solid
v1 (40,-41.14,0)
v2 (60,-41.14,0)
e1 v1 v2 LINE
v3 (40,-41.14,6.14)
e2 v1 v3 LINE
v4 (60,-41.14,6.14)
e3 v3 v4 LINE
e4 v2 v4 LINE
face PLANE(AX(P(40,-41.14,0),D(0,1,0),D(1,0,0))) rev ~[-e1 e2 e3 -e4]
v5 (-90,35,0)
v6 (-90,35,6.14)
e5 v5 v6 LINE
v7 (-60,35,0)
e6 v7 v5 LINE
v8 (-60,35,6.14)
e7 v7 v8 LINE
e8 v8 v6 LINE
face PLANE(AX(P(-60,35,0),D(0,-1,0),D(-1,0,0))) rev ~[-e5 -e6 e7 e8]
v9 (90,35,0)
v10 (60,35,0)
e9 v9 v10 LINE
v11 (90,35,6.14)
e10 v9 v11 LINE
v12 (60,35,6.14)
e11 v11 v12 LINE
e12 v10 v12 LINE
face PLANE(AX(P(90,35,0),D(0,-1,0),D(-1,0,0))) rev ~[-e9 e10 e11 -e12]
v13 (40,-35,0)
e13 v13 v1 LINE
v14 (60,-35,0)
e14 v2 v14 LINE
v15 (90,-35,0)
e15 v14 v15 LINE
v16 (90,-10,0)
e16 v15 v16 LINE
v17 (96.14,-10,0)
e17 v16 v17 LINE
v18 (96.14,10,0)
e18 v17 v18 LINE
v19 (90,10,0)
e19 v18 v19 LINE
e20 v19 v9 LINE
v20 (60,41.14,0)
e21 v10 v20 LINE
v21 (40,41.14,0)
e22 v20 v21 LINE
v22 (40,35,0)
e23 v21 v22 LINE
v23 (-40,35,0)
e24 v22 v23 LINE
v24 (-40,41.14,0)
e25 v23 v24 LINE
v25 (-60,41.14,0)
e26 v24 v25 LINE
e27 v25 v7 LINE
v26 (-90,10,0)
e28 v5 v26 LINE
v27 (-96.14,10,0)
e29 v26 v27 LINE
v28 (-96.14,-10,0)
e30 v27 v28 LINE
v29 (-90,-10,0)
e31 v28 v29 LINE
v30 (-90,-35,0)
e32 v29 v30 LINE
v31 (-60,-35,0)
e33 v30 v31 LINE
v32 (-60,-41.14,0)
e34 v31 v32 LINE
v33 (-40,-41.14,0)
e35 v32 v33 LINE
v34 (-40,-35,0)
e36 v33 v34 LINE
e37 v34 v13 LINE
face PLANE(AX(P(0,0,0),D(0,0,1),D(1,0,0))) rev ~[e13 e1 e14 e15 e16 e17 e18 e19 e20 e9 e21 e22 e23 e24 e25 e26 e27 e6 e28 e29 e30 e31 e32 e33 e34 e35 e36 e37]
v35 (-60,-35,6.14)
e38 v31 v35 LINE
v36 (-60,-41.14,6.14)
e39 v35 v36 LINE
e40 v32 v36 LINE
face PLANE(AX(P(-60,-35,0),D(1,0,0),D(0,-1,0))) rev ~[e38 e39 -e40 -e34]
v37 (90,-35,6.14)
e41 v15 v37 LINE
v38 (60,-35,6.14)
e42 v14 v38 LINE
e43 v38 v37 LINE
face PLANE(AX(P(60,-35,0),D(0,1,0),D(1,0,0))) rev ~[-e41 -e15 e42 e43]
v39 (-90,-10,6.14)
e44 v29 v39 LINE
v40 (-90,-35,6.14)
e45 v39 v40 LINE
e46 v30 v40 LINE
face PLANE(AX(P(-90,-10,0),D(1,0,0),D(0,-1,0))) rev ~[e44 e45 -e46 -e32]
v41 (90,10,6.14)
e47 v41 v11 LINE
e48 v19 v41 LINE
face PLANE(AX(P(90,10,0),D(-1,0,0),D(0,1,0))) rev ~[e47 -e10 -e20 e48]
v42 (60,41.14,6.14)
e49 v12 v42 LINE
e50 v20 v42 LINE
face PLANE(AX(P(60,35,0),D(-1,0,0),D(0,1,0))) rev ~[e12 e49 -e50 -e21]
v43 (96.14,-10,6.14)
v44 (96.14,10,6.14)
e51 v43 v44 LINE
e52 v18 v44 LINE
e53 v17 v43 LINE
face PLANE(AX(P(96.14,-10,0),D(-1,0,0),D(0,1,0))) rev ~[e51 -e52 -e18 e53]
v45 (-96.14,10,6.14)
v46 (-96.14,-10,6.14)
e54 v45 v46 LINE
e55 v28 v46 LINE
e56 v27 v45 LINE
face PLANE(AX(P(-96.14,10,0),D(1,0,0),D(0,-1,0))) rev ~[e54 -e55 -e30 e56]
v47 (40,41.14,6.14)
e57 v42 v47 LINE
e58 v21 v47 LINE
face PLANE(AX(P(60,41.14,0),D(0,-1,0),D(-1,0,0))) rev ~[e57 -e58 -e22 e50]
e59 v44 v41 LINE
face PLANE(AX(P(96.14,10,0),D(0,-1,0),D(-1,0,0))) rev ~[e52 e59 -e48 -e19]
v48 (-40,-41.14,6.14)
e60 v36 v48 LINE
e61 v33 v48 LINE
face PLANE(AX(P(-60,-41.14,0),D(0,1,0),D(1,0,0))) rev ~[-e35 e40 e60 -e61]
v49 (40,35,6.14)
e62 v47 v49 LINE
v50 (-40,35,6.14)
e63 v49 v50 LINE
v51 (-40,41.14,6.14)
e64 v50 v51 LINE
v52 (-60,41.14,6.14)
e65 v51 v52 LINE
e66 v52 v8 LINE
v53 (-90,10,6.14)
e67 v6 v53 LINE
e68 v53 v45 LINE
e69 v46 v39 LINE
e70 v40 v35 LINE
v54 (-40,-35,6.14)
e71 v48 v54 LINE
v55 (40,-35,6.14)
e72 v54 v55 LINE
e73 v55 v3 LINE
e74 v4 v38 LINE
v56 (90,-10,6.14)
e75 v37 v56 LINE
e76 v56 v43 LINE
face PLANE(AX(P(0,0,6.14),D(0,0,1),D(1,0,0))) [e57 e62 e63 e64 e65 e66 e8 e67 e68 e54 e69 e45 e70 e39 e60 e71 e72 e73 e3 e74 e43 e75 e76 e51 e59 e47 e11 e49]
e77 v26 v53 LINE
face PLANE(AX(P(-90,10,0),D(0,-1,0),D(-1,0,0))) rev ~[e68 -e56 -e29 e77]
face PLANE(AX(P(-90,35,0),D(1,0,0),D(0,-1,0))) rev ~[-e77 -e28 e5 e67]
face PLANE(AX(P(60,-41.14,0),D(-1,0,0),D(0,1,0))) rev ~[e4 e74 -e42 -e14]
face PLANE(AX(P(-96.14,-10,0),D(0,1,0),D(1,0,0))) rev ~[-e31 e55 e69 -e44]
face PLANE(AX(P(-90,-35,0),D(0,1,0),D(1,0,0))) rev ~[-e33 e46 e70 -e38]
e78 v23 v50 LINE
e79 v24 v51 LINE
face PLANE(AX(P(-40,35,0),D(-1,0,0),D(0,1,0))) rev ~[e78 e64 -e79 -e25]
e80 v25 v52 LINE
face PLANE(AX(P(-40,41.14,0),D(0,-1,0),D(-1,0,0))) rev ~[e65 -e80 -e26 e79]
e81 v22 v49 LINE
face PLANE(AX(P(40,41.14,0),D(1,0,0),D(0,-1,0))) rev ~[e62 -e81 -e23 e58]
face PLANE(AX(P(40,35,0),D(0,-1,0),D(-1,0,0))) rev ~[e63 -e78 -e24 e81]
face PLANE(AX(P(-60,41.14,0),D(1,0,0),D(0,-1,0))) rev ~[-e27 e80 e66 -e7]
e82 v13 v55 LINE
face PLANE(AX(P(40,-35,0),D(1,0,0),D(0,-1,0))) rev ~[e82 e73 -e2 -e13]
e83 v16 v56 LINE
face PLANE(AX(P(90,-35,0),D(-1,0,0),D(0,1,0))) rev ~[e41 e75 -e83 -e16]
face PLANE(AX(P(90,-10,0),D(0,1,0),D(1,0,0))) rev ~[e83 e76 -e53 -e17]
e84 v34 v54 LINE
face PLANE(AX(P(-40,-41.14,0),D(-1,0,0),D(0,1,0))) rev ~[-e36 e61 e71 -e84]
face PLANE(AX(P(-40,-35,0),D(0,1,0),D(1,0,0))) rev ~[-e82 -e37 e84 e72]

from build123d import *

# Parameters (mm, degrees)
F2_DEPTH = 6.14


# Not quite as in the source:
# - a feature names something its author has since deleted; it is built from what else it names


with BuildPart() as f2:
    # F1 (on Top) → F2 (new body)
    with BuildSketch(Plane.XY):
        Polygon((90, 10), (90, 35), (60, 35), (60, 41.14), (40, 41.14), (40, 35), (-40, 35), (-40, 41.14), (-60, 41.14), (-60, 35), (-90, 35), (-90, 10), (-96.14, 10), (-96.14, -10), (-90, -10), (-90, -35), (-60, -35), (-60, -41.14), (-40, -41.14), (-40, -35), (40, -35), (40, -41.14), (60, -41.14), (60, -35), (90, -35), (90, -10), (96.14, -10), (96.14, 10), align=None)
    extrude(amount=F2_DEPTH)


solid = f2.part
